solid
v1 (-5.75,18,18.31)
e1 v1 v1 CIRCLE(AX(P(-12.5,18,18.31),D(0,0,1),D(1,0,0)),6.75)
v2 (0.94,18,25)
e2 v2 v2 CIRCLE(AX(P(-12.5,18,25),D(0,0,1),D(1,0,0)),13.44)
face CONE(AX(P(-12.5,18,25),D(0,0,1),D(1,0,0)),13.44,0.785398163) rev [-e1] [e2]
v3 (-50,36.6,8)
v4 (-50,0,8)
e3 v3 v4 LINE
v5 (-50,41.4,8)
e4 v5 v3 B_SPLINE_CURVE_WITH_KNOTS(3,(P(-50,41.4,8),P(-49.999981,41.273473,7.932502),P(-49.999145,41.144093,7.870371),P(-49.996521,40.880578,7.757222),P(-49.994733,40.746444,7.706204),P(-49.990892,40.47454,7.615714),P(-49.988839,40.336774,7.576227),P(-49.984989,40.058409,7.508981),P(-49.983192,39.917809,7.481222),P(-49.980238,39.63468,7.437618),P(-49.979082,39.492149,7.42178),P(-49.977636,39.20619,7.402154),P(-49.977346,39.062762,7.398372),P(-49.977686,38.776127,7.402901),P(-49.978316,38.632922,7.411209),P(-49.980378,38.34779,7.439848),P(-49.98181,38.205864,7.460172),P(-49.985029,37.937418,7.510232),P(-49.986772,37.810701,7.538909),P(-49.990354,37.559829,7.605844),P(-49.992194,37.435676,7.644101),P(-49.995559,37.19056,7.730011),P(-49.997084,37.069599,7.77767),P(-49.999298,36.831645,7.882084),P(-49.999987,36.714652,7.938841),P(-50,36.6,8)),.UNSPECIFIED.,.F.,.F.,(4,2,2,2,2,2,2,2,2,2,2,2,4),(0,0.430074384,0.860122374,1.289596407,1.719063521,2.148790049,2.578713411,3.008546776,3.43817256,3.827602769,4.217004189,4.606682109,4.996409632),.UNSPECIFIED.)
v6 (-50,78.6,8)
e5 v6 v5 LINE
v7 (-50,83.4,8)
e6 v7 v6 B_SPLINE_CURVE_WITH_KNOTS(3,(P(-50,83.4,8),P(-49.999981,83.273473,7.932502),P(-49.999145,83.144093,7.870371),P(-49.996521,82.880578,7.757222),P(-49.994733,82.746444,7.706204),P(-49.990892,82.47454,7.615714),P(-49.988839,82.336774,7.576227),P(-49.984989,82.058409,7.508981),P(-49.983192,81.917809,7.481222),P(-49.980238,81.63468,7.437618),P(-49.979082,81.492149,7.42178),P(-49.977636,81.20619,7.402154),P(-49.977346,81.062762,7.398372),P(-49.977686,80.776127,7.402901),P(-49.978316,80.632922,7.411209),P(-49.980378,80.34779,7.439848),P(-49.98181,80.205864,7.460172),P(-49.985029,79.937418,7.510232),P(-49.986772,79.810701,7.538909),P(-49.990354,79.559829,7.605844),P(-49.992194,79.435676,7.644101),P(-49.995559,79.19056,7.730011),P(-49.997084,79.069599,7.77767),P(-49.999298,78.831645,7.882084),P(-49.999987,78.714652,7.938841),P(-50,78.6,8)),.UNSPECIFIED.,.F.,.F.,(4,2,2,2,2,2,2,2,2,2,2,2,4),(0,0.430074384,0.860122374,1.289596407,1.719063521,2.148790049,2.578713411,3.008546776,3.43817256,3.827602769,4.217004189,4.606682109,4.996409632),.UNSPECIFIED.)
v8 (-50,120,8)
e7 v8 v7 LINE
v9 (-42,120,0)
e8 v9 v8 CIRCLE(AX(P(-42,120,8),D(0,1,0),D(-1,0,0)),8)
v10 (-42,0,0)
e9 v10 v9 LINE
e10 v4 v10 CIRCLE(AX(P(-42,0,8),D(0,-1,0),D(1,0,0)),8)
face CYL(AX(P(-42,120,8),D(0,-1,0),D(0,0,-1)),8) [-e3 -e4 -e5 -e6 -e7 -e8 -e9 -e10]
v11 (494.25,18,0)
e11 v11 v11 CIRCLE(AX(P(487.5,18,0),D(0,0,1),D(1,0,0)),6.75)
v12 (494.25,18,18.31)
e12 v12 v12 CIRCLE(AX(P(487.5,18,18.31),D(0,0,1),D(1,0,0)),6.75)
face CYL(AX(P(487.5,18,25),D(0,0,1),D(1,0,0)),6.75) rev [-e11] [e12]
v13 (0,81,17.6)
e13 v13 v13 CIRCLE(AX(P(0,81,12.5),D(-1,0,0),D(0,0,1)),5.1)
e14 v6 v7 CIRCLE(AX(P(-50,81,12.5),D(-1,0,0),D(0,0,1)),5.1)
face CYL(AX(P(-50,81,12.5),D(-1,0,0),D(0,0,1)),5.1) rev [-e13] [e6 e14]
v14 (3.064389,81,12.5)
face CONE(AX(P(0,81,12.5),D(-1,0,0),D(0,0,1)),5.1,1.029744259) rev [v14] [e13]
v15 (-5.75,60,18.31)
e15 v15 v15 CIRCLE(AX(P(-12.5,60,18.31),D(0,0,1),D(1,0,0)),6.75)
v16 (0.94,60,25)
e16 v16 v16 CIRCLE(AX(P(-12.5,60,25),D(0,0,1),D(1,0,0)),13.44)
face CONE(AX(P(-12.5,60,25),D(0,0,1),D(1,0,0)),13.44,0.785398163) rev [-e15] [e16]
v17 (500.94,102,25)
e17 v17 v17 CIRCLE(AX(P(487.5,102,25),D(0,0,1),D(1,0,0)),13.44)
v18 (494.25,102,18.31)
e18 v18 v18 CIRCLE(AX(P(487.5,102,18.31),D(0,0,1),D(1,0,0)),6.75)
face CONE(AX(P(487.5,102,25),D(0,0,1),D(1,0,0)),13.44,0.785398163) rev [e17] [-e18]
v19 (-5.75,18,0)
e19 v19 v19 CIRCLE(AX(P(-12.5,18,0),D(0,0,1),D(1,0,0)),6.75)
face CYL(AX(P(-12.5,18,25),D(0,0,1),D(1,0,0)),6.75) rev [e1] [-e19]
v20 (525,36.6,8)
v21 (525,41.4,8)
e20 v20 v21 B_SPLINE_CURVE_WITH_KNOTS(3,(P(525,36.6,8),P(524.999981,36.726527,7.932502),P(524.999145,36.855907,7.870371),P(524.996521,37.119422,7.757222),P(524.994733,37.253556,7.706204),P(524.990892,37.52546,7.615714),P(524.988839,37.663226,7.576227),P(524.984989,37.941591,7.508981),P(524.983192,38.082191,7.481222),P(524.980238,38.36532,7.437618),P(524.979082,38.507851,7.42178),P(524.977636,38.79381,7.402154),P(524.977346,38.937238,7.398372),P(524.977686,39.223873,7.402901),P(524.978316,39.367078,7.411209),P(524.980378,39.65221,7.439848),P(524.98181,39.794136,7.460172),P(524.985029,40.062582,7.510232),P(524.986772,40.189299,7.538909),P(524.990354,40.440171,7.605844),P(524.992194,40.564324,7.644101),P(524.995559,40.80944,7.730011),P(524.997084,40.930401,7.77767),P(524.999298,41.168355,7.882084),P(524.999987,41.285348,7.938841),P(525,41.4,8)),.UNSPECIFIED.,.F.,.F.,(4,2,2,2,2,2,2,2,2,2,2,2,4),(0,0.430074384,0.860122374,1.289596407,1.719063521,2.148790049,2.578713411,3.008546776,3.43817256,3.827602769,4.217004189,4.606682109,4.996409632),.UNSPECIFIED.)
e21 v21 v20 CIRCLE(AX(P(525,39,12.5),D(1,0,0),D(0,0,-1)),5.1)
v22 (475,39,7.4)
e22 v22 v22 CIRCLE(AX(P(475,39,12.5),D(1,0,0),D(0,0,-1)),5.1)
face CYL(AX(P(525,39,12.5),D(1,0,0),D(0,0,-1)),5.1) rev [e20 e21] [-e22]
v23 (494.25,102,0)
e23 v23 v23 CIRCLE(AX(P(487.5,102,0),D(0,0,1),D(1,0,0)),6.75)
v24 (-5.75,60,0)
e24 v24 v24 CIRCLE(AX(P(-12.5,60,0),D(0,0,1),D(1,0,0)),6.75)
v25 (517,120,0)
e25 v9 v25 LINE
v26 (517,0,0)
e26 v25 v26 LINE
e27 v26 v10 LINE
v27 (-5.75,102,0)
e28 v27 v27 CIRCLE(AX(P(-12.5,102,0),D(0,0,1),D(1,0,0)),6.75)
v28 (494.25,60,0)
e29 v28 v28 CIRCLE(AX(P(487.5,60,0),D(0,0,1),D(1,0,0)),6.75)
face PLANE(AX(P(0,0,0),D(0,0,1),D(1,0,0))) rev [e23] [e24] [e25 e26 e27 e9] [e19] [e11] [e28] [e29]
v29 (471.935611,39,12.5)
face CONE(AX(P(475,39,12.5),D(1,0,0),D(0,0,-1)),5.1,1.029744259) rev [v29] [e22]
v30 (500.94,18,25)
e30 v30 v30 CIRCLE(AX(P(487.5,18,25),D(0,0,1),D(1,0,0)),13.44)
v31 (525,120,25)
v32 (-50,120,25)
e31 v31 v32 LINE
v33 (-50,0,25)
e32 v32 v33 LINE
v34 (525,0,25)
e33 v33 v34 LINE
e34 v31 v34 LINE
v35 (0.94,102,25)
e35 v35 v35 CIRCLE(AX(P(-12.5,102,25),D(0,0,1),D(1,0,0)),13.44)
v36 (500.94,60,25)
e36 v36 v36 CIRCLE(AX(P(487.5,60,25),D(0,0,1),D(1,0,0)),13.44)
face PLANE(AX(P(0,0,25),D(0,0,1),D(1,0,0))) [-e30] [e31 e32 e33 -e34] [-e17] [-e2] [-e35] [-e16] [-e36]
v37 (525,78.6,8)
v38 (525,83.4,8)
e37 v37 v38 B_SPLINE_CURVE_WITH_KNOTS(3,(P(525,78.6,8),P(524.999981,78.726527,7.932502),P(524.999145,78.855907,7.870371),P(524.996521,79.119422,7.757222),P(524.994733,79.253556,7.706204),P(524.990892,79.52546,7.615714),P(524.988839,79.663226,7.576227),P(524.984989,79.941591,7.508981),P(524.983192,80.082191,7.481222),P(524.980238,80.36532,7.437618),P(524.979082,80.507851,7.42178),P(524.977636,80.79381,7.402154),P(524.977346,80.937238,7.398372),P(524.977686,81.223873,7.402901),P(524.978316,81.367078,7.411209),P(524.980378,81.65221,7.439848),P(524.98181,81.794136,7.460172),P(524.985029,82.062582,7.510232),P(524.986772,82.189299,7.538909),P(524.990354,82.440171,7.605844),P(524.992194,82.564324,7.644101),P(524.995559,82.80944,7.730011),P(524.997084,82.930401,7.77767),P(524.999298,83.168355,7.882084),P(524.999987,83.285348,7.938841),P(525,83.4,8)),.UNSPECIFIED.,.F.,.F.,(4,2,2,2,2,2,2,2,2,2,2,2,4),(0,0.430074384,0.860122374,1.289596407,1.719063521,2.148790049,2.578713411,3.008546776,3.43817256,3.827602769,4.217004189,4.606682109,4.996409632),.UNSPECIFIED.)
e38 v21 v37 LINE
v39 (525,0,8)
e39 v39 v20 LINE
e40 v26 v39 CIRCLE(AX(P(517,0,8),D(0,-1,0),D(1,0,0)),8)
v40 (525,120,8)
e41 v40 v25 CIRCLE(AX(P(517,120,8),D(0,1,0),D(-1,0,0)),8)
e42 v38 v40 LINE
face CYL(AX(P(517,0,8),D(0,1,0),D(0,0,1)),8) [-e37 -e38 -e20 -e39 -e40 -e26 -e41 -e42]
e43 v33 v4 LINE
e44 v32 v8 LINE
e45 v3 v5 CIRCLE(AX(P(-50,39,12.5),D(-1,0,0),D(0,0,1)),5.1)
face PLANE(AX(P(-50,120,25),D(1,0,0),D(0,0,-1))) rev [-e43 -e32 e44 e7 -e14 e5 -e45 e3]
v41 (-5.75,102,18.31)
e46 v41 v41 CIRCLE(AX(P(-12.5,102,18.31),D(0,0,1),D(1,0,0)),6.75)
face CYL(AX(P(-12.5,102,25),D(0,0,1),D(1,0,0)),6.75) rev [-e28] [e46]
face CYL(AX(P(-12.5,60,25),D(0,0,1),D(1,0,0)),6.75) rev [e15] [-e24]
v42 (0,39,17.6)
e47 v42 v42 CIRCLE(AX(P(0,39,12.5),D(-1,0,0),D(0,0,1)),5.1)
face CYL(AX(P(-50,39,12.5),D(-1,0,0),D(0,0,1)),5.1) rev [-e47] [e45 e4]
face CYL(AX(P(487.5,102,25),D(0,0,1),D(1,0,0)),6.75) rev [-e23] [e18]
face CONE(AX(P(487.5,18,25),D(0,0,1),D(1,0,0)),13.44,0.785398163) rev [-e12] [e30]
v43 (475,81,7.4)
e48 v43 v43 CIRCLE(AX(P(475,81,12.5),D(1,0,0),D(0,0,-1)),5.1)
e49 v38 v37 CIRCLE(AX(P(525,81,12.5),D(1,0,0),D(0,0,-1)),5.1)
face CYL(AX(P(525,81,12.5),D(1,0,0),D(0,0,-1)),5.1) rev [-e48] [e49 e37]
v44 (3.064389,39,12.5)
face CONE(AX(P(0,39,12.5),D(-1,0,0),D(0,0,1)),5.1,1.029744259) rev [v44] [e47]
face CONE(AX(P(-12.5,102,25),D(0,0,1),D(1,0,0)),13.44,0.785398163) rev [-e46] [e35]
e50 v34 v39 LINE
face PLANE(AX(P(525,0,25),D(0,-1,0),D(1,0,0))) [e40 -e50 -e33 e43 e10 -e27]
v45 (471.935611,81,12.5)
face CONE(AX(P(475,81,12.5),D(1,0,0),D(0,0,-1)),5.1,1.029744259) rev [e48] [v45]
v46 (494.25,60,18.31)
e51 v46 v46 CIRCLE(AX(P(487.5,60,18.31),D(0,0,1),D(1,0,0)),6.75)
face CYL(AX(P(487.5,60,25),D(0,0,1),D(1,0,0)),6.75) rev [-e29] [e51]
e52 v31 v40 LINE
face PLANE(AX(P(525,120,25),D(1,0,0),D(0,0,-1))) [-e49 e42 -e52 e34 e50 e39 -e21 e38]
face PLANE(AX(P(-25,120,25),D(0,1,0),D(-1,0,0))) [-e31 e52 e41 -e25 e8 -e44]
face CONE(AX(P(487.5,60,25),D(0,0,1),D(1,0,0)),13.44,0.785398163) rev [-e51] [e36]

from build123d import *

# Parameters (mm, degrees)
RESSALTO_EXTRUS_O1_DEPTH                            = 25
ESCAREADO_PARA_PARAFUSO_ALLEN_SEXTAVADO_D           = 13.5
ESCAREADO_PARA_PARAFUSO_ALLEN_SEXTAVADO_DEPTH       = 25
ESCAREADO_PARA_PARAFUSO_ALLEN_SEXTAVADO_CSINK_D     = 26.88
ESCAREADO_PARA_PARAFUSO_ALLEN_SEXTAVADO_CSINK_ANGLE = 90
ESCAREADO_PARA_PARAFUSO_ALLEN_SEXTAVADO_TIP         = 4.055809178
FURO_ROSCADO_DE_M121_AT_2_COUNT                     = 2
FURO_ROSCADO_DE_M121_AT_2_PITCH                     = 42
FILETE1_R                                           = 8


with BuildPart() as part:
    # Esboço1 → Ressalto-extrusão1 (new body)
    with BuildSketch(Plane.XY):
        Polygon((-25, 120), (500, 120), (525, 120), (525, 0), (500, 0), (-25, 0), (-50, 0), (-50, 120), align=None)
    extrude(amount=RESSALTO_EXTRUS_O1_DEPTH)

    # Escareado para parafuso Allen sextavado escareado de M121
    with Locations(Plane.XY.offset(25)):
        with Locations((-12.5, 102), (-12.5, 60), (-12.5, 18), (487.5, 102), (487.5, 60), (487.5, 18)):
            CounterSinkHole(ESCAREADO_PARA_PARAFUSO_ALLEN_SEXTAVADO_D / 2, ESCAREADO_PARA_PARAFUSO_ALLEN_SEXTAVADO_CSINK_D / 2, depth=ESCAREADO_PARA_PARAFUSO_ALLEN_SEXTAVADO_DEPTH, counter_sink_angle=ESCAREADO_PARA_PARAFUSO_ALLEN_SEXTAVADO_CSINK_ANGLE)
            with Locations((0, 0, -(ESCAREADO_PARA_PARAFUSO_ALLEN_SEXTAVADO_DEPTH + ESCAREADO_PARA_PARAFUSO_ALLEN_SEXTAVADO_TIP / 2))):  # 118° drill point
                Cone(0, ESCAREADO_PARA_PARAFUSO_ALLEN_SEXTAVADO_D / 2, ESCAREADO_PARA_PARAFUSO_ALLEN_SEXTAVADO_TIP, mode=Mode.SUBTRACT)

    # Esboço6 → Furo roscado de M121 (revolve, cut)
    with BuildSketch(Plane(origin=(-50, 81, 12.5), x_dir=(0, 0, 1), z_dir=(0, 1, 0))):
        Polygon((0, 0), (0, 53.064389157), (5.1, 50), (5.1, 0), align=None)
    furo_roscado_de_m121 = revolve(axis=Axis((-56.35, 81, 12.5), (1, 0, 0)), mode=Mode.SUBTRACT)

    # Furo roscado de M121 at 2: Furo roscado de M121 ×2
    with Locations(*[(0, -i * FURO_ROSCADO_DE_M121_AT_2_PITCH, 0) for i in range(1, FURO_ROSCADO_DE_M121_AT_2_COUNT)]):
        add(furo_roscado_de_m121, mode=Mode.SUBTRACT)

    # Espelhar1: Furo roscado de M121 across plane
    add(furo_roscado_de_m121.mirror(Plane.ZY.offset(-237.5)), mode=Mode.SUBTRACT)

    # Espelhar1 copy 1 sketch → Espelhar1 copy 1 (revolve, cut)
    with BuildSketch(Plane(origin=(525, 39, 12.5), x_dir=(0, 0, 1), z_dir=(0, 1, 0))):
        Polygon((0, 0), (0, -53.064389157), (5.1, -50), (5.1, 0), align=None)
    revolve(axis=Axis((531.35, 39, 12.5), (1, 0, 0)), mode=Mode.SUBTRACT)

    # Filete1
    # the kernel refuses this fillet: 8 mm, written as the material it takes off along each edge
    with BuildSketch(Plane(origin=(-50, -20, 0), x_dir=(0, 0, 1), z_dir=(0, 1, 0)), Plane(origin=(525, 140, 0), x_dir=(0, 0, 1), z_dir=(0, -1, 0))) as filete1_piece_1:
        with BuildLine():
            CenterArc((FILETE1_R, FILETE1_R), FILETE1_R, 180, 90)
            Line((0, FILETE1_R), (0, 0))
            Line((0, 0), (FILETE1_R, 0))
        make_face()
    extrude(amount=160, mode=Mode.SUBTRACT)


solid = part.part
